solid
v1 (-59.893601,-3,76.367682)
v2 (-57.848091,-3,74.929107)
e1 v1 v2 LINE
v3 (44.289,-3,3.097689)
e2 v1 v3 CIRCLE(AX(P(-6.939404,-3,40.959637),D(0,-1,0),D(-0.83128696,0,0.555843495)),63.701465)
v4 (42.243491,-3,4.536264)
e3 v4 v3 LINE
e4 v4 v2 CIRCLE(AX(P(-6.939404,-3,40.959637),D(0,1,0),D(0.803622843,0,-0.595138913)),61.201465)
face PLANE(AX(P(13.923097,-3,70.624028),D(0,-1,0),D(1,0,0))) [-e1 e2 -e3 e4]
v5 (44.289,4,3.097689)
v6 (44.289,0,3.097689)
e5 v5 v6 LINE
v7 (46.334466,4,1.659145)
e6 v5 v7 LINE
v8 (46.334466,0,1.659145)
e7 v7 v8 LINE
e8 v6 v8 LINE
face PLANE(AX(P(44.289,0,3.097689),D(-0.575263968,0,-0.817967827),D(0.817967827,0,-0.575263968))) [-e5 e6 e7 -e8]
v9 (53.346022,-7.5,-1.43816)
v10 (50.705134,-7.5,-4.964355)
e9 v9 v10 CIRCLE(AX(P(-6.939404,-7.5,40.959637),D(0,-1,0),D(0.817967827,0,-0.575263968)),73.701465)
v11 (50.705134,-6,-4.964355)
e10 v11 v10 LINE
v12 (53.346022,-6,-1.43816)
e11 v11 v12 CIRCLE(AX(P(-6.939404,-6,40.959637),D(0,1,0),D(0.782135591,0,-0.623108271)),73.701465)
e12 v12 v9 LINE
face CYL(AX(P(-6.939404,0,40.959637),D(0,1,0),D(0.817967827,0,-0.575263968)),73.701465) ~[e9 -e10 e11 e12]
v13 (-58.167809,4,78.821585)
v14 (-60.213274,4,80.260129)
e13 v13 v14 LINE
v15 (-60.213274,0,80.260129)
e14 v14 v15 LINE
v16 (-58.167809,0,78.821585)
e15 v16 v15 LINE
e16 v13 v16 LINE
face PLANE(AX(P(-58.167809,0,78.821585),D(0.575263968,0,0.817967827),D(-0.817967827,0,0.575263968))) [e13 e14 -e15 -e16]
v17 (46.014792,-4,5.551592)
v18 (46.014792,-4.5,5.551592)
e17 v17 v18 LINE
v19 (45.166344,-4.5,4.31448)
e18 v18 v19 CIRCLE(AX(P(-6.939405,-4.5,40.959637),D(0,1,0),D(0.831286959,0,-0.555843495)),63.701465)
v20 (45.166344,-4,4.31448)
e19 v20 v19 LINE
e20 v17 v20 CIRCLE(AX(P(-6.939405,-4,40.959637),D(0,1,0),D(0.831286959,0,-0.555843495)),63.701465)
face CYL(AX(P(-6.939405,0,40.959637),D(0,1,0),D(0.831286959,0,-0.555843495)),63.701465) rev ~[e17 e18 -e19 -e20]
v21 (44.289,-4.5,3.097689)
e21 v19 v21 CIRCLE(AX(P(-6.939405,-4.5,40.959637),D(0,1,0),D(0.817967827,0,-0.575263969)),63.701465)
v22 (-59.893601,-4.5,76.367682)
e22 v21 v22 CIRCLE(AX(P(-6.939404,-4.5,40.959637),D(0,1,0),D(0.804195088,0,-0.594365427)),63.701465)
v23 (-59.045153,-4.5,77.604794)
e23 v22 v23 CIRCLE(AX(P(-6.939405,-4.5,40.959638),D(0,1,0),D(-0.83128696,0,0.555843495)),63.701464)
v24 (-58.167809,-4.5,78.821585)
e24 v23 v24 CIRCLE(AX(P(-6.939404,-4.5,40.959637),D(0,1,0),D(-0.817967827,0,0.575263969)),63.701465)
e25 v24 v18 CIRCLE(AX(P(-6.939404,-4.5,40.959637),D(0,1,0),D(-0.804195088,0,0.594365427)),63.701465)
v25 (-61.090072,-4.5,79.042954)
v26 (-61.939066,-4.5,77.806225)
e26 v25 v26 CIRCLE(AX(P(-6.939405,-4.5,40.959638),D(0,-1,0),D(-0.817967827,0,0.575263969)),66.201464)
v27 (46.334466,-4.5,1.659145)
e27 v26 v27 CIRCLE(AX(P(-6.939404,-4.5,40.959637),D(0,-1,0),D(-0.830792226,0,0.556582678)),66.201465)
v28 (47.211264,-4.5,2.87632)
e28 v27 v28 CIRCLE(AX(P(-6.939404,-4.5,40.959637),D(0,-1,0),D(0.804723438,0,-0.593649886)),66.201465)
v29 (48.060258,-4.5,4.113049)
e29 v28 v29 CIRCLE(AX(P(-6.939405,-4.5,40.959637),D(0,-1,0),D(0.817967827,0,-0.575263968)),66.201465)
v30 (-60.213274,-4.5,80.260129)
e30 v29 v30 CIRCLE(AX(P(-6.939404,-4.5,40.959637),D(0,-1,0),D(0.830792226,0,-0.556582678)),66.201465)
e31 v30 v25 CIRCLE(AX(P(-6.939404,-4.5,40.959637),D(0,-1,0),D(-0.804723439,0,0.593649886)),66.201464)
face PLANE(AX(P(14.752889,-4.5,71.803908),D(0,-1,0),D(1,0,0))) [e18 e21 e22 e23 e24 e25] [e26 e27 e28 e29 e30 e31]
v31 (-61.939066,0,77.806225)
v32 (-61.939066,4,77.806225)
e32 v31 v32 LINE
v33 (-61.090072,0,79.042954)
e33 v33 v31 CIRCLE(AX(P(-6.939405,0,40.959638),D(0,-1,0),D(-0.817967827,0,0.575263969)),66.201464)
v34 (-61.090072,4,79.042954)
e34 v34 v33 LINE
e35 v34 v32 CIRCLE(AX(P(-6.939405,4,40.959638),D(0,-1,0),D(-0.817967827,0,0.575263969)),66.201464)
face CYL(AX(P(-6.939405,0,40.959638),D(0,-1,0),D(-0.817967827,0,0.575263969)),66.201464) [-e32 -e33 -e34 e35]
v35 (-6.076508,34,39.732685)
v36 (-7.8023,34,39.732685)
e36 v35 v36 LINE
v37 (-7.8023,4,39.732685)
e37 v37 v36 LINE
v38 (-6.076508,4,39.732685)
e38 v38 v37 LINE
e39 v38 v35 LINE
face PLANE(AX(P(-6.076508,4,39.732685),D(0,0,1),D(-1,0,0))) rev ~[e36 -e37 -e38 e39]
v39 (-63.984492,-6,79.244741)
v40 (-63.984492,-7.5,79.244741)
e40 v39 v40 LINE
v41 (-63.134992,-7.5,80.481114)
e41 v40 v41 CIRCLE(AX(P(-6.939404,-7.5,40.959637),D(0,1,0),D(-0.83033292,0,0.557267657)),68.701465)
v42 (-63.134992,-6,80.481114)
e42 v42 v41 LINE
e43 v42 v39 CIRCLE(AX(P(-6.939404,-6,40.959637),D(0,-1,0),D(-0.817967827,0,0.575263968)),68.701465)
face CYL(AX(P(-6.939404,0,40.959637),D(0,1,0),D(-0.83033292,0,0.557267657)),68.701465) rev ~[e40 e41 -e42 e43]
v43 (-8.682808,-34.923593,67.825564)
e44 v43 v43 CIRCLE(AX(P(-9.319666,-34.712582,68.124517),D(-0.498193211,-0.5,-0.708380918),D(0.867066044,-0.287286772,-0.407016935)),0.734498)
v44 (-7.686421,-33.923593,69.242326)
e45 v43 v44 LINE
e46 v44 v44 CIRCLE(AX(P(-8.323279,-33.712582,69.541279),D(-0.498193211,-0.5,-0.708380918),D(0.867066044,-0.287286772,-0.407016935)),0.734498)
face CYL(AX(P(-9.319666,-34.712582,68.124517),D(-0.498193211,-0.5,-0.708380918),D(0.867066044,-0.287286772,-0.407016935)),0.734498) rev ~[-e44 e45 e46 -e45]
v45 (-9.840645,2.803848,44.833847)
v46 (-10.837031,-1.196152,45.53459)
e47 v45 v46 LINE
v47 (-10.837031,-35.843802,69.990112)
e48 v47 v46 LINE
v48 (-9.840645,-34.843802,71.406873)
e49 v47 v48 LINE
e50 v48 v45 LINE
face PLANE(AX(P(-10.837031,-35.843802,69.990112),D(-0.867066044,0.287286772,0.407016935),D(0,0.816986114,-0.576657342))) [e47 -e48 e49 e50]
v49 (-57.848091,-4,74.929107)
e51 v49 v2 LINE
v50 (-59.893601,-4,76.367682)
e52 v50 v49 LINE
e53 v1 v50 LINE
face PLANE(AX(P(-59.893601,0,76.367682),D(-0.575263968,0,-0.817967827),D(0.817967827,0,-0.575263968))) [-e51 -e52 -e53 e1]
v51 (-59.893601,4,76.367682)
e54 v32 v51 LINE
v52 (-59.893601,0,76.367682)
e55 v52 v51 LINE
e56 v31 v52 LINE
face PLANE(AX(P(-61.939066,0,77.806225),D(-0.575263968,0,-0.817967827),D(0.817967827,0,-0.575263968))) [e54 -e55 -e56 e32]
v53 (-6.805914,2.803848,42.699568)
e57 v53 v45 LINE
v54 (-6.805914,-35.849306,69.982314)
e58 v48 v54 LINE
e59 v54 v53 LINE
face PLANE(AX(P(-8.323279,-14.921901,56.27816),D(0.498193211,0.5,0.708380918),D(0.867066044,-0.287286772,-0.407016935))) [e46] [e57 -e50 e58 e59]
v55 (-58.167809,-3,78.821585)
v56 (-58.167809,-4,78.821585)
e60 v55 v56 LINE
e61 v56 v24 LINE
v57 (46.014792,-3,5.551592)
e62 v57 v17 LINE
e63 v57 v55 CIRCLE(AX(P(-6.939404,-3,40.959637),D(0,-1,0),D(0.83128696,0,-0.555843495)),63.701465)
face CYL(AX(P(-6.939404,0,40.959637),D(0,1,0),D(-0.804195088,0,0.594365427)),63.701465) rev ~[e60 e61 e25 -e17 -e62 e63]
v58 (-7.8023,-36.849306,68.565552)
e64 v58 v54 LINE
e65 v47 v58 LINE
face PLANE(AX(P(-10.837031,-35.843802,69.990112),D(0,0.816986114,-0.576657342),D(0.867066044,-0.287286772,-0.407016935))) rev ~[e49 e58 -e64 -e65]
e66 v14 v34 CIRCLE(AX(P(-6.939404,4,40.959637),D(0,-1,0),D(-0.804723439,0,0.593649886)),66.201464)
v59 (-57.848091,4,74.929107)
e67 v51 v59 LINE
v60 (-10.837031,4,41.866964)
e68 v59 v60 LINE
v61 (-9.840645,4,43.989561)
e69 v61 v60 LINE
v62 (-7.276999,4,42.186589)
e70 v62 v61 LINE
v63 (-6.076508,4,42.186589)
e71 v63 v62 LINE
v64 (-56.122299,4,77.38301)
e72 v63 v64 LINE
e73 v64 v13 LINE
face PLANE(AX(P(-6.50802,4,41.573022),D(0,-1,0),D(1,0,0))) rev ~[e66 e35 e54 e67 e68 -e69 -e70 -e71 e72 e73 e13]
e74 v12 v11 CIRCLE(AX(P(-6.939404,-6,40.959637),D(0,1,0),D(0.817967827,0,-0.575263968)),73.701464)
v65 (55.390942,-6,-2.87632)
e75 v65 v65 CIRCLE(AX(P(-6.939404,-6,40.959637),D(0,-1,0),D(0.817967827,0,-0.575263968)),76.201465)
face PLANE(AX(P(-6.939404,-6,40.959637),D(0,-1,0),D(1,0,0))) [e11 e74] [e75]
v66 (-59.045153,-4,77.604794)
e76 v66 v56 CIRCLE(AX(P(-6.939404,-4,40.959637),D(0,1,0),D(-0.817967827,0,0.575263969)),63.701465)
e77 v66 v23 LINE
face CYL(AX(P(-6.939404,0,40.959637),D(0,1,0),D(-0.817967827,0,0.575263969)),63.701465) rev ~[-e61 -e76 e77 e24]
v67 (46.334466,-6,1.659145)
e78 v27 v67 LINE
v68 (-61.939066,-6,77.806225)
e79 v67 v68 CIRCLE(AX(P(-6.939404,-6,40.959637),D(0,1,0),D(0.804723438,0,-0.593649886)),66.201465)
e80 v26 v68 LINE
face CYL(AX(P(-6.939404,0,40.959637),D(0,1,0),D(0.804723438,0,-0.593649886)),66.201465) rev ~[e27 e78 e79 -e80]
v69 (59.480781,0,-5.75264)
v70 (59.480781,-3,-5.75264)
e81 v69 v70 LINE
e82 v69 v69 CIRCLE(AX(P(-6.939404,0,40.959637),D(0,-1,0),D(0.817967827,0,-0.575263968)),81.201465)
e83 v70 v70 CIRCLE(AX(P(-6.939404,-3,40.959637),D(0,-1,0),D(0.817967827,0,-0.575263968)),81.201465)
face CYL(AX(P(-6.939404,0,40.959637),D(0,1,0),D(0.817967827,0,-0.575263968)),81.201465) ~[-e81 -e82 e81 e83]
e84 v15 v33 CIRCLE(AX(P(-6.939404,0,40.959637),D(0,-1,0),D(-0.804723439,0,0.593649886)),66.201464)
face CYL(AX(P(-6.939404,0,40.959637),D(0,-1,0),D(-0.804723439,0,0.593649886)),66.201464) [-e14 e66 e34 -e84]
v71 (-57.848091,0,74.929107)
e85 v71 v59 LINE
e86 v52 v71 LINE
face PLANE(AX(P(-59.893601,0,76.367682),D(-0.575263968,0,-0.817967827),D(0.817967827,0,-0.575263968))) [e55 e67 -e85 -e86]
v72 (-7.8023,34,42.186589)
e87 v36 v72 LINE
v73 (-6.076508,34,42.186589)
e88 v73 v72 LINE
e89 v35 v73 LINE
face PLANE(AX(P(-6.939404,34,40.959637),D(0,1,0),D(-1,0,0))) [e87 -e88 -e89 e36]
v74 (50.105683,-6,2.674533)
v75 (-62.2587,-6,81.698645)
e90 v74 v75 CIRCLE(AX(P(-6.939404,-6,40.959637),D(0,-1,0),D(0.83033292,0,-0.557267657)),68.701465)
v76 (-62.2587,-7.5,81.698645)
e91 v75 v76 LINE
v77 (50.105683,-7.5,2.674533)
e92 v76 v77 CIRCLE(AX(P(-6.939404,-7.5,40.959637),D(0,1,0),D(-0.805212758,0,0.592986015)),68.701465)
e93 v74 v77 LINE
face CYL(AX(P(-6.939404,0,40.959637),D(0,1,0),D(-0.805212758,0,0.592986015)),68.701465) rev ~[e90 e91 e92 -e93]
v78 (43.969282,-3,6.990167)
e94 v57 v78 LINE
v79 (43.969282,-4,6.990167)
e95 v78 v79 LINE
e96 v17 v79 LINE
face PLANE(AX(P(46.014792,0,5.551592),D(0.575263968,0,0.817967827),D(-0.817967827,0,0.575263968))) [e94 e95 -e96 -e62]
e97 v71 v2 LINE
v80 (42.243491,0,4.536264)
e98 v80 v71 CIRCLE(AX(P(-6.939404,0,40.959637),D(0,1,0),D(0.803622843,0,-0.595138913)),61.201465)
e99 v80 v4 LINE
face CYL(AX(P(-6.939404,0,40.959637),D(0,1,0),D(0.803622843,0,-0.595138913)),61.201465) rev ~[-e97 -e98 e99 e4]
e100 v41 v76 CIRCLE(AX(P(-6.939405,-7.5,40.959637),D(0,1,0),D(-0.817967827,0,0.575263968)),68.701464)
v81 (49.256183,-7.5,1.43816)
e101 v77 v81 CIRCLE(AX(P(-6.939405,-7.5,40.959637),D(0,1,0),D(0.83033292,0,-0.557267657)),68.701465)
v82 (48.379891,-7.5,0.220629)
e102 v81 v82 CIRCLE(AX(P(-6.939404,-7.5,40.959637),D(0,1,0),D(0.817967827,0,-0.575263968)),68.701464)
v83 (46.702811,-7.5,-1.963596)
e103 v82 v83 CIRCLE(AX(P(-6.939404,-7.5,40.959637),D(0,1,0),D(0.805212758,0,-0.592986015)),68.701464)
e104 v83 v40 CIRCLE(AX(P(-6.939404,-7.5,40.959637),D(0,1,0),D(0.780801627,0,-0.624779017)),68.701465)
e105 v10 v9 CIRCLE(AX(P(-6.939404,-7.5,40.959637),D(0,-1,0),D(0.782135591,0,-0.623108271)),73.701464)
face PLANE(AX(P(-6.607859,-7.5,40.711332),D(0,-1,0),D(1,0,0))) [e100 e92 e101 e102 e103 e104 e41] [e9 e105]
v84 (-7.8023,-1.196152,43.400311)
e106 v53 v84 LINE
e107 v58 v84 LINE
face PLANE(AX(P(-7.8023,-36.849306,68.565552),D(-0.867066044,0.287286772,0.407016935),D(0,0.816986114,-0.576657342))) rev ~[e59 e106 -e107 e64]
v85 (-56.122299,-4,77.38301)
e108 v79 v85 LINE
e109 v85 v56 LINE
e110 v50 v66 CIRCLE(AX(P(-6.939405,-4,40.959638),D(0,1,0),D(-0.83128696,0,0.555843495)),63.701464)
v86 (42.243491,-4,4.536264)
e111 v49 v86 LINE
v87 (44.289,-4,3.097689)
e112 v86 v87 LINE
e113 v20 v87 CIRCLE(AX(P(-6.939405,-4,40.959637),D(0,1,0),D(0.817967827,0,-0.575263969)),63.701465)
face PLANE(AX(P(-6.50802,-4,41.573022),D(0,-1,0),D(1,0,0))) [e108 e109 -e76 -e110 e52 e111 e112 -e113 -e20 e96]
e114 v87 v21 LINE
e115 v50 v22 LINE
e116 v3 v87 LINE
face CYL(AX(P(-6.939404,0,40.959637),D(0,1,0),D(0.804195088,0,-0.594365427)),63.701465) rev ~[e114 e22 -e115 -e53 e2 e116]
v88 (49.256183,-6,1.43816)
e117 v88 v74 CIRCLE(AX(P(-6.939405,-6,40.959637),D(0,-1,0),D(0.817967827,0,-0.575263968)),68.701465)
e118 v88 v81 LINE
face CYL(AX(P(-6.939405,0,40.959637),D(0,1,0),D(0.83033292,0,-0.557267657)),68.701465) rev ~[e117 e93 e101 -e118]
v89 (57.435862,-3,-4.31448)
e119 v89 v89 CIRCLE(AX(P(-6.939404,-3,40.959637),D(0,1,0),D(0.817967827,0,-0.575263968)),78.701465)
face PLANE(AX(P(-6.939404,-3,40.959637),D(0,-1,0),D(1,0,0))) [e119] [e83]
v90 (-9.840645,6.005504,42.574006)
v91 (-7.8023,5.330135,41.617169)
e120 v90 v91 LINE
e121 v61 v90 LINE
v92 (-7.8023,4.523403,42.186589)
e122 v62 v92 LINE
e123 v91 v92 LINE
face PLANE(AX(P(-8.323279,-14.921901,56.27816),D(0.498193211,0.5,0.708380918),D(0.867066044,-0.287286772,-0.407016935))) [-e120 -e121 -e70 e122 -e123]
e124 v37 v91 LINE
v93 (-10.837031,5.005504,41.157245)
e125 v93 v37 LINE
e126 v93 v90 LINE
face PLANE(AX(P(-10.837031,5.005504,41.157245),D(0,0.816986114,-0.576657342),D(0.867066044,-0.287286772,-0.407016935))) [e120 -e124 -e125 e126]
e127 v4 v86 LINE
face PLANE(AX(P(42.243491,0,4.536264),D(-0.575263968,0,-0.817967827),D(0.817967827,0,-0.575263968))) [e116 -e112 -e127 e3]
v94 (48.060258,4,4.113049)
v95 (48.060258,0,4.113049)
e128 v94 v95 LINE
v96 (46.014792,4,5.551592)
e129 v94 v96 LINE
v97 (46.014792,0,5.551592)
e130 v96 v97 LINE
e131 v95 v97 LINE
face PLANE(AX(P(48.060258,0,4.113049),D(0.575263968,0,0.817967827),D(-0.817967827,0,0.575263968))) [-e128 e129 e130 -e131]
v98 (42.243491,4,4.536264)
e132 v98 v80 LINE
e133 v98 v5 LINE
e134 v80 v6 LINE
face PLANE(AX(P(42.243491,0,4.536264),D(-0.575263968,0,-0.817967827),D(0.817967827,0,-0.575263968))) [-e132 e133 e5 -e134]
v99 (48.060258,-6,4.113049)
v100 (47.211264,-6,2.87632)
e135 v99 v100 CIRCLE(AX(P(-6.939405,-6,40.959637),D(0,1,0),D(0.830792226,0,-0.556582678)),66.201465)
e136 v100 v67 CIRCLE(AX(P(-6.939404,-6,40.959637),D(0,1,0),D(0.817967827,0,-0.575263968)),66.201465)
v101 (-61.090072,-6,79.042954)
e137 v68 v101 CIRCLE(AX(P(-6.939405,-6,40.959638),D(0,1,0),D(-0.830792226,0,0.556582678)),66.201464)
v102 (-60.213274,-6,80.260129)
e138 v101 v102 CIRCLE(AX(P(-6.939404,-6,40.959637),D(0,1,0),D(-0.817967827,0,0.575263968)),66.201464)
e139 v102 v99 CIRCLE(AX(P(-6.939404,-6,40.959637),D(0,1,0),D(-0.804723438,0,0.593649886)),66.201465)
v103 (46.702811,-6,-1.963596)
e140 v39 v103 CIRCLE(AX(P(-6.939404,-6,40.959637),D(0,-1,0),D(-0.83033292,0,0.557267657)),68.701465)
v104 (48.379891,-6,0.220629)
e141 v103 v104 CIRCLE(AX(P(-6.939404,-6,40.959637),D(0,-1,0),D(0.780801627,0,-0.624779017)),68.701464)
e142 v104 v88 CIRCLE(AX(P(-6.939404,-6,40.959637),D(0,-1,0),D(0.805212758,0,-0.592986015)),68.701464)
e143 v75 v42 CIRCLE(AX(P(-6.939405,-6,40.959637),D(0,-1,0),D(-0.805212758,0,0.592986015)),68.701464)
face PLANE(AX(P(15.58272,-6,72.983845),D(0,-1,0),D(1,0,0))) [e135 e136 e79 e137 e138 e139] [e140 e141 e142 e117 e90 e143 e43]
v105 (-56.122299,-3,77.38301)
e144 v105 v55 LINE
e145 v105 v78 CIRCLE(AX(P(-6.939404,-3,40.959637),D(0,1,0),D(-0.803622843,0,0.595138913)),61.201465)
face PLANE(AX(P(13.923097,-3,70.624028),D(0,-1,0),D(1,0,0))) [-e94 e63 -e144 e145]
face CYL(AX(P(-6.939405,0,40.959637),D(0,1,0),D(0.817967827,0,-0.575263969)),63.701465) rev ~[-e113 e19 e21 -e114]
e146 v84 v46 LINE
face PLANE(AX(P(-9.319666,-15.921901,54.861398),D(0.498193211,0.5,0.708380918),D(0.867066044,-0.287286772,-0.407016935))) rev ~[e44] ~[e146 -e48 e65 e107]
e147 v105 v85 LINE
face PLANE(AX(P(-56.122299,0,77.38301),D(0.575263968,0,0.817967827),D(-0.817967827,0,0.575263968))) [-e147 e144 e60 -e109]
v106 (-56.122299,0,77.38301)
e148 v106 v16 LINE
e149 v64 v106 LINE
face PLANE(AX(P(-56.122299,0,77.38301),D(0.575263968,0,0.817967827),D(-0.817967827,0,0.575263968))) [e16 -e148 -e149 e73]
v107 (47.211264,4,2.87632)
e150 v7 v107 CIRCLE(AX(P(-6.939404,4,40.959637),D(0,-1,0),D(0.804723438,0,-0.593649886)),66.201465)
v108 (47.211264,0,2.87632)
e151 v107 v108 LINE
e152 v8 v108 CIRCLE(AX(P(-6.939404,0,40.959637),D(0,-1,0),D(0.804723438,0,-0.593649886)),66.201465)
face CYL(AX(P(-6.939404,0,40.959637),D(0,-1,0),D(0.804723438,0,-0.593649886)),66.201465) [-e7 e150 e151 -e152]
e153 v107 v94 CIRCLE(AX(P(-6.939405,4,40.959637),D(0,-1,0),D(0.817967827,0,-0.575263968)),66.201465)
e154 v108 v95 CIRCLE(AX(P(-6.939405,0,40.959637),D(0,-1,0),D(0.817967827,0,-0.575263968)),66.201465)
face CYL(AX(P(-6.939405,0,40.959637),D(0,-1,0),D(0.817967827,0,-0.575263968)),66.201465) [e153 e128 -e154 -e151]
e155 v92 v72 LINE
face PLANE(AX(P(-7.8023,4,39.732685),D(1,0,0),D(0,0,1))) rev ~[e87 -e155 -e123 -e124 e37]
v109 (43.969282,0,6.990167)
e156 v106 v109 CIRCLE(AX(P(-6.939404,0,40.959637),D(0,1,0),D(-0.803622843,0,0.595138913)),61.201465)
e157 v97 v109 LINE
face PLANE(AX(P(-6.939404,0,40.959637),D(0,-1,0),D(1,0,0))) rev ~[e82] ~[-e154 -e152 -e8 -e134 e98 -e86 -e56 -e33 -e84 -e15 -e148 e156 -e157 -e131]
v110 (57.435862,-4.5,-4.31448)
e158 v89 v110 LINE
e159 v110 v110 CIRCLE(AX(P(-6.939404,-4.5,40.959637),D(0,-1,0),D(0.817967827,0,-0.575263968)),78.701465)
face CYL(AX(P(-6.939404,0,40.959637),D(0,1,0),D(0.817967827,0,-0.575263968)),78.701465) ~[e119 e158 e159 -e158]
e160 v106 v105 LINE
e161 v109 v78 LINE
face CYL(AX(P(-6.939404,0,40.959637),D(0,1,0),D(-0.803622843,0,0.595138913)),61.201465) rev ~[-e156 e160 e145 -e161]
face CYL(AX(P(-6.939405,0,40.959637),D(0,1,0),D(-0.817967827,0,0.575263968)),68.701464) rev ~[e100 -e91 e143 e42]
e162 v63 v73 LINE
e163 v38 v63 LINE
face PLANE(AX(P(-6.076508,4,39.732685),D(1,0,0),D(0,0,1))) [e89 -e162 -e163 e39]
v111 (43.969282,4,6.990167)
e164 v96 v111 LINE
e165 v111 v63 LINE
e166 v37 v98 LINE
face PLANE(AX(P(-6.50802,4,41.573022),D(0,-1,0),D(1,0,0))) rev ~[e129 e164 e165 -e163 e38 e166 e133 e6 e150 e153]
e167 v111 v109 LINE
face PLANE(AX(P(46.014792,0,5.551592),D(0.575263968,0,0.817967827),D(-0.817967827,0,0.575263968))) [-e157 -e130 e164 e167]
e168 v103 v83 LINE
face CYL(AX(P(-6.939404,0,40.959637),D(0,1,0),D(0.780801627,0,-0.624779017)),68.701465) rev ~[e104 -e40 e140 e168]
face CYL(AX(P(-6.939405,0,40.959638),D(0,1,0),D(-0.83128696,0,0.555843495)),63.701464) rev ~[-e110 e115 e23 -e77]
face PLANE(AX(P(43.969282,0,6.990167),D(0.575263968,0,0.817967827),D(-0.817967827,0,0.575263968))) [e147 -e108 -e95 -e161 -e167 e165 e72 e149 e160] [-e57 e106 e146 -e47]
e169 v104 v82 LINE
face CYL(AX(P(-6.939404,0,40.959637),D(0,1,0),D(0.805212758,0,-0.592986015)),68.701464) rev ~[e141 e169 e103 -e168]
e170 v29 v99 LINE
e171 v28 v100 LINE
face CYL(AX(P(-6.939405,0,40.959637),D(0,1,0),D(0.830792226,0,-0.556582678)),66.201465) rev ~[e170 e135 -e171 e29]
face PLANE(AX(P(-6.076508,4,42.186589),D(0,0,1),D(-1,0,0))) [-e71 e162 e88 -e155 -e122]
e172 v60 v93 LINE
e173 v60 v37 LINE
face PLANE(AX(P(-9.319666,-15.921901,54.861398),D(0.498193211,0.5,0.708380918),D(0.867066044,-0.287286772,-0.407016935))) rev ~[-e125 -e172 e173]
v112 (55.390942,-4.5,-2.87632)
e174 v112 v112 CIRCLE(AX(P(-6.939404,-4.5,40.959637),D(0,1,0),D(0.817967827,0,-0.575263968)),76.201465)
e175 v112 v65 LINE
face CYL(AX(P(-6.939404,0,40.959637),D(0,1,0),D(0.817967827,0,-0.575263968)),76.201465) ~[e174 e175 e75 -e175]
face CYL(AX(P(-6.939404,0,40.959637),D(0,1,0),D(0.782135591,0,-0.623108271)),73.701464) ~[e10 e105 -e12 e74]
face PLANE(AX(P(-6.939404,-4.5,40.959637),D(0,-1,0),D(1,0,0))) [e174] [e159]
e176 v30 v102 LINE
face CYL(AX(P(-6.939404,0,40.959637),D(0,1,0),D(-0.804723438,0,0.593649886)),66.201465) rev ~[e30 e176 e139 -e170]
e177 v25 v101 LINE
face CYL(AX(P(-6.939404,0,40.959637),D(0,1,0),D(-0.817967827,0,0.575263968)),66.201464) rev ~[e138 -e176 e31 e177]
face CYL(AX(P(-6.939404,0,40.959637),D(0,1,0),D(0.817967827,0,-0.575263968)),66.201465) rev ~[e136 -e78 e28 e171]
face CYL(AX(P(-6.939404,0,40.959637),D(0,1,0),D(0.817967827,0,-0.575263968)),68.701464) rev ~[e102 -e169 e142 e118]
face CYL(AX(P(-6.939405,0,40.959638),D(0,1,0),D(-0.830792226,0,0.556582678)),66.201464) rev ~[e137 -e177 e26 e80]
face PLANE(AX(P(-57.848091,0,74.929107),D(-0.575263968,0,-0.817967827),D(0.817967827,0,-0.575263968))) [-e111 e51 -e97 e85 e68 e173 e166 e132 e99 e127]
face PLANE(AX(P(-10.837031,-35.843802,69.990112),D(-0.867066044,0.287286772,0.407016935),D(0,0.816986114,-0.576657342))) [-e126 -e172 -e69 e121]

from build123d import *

# Parameters (mm, degrees)
F5_DEPTH  = 3
F6_DEPTH  = 4.5
F7_DEPTH  = 6
F8_DEPTH  = 7.5
F9_DEPTH  = 4
F12_W     = 1.7257919054
F12_H     = 2.4539034821
F13_DEPTH = 30
F15_W     = 3.5
F15_H     = 50
F16_DEPTH = 2
F17_R     = 0.7344979233
F18_DEPTH = 2


# Not quite as in the source:
# - the program builds the solid bodies; features that only make, move or delete a surface that nothing else refers to are left out


with BuildPart() as f5:
    # F4 (on 3pt) → F5 (new body)
    with BuildSketch(Plane.XZ):
        with BuildLine():
            ThreePointArc((-73.3595898483, 87.6719137514), (-53.6516810637, -25.4605484692), (59.4807811569, -5.7526396846))
            ThreePointArc((59.4807811569, -5.7526396846), (39.7728723723, 107.379822536), (-73.3595898483, 87.6719137514))
        make_face()
        with BuildLine():
            ThreePointArc((-71.3146702799, 86.2337538303), (38.3347124511, 105.3349029676), (57.4358615885, -4.3144797634))
            ThreePointArc((57.4358615885, -4.3144797634), (-52.2135211426, -23.4156289008), (-71.3146702799, 86.2337538303))
        make_face(mode=Mode.SUBTRACT)
    extrude(amount=F5_DEPTH)

    # F4 (on 3pt) → F6 (join)
    with BuildSketch(Plane.XZ):
        with BuildLine():
            ThreePointArc((-71.3146702799, 86.2337538303), (-52.2135211426, -23.4156289008), (57.4358615885, -4.3144797634))
            ThreePointArc((57.4358615885, -4.3144797634), (38.3347124511, 105.3349029676), (-71.3146702799, 86.2337538303))
        make_face()
        with BuildLine():
            ThreePointArc((-69.2697507115, 84.7955939091), (36.89655253, 103.2899833992), (55.3909420201, -2.8763198423))
            ThreePointArc((55.3909420201, -2.8763198423), (-50.7753612214, -21.3707093324), (-69.2697507115, 84.7955939091))
        make_face(mode=Mode.SUBTRACT)
    extrude(amount=F6_DEPTH)

    # F4 (on 3pt) → F7 (join)
    with BuildSketch(Plane.XZ):
        with BuildLine():
            ThreePointArc((-69.2697507115, 84.7955939091), (-50.7753612214, -21.3707093324), (55.3909420201, -2.8763198423))
            ThreePointArc((55.3909420201, -2.8763198423), (36.89655253, 103.2899833992), (-69.2697507115, 84.7955939091))
        make_face()
        with BuildLine():
            ThreePointArc((53.3460224517, -1.4381599211), (52.0519313936, -3.2209942256), (50.7051341625, -4.9643550723))
            ThreePointArc((50.7051341625, -4.9643550723), (-51.1200356047, -18.0316987059), (-67.2248311431, 83.357433988))
            ThreePointArc((-67.2248311431, 83.357433988), (35.4583926089, 101.2450638308), (53.3460224517, -1.4381599211))
        make_face(mode=Mode.SUBTRACT)
    extrude(amount=F7_DEPTH)



with BuildPart() as f5b:
    # F4 (on 3pt) → F5, piece 2 (new body)
    with BuildSketch(Plane.XZ):
        with BuildLine():
            ThreePointArc((46.0147924033, 5.5515923651), (29.7057529243, 93.0653855572), (-58.1678091893, 78.8215851838))
            Line((-58.1678091893, 78.8215851838), (-56.1222992763, 77.3830100825))
            ThreePointArc((-56.1222992763, 77.3830100825), (28.2675930031, 91.0204659888), (43.9692824902, 6.9901674664))
            Line((43.9692824902, 6.9901674664), (46.0147924033, 5.5515923651))
        make_face()
        with BuildLine():
            Line((-57.8480911816, 74.9291066004), (-59.8936010947, 76.3676817018))
            ThreePointArc((-59.8936010947, 76.3676817018), (-43.5845616157, -11.1461114904), (44.2890004979, 3.097688883))
            Line((44.2890004979, 3.097688883), (42.2434905848, 4.5362639843))
            ThreePointArc((42.2434905848, 4.5362639843), (-42.1464016945, -9.101191922), (-57.8480911816, 74.9291066004))
        make_face()
        with BuildLine():
            Line((-57.0002333011, 76.1666343822), (-59.0451528695, 77.6047943034))
            ThreePointArc((-59.0451528695, 77.6047943034), (-59.4730186996, 76.9887355996), (-59.8936010947, 76.3676817018))
            Line((-59.8936010947, 76.3676817018), (-57.8480911816, 74.9291066004))
            ThreePointArc((-57.8480911816, 74.9291066004), (-57.4279540232, 75.5504683256), (-57.0002333011, 76.1666343822))
        make_face()
        with BuildLine():
            ThreePointArc((-58.1678091893, 78.8215851838), (-58.6100629253, 78.2157724008), (-59.0451528695, 77.6047943034))
            Line((-59.0451528695, 77.6047943034), (-57.0002333011, 76.1666343822))
            ThreePointArc((-57.0002333011, 76.1666343822), (-56.5649932606, 76.7775122199), (-56.1222992763, 77.3830100825))
            Line((-56.1222992763, 77.3830100825), (-58.1678091893, 78.8215851838))
        make_face()
        with BuildLine():
            Line((42.2434905848, 4.5362639843), (44.2890004979, 3.097688883))
            ThreePointArc((44.2890004979, 3.097688883), (44.7312542339, 3.703501666), (45.1663441781, 4.3144797634))
            Line((45.1663441781, 4.3144797634), (43.1214246097, 5.7526396846))
            ThreePointArc((43.1214246097, 5.7526396846), (42.6861845692, 5.1417618469), (42.2434905848, 4.5362639843))
        make_face()
        with BuildLine():
            ThreePointArc((45.1663441781, 4.3144797634), (45.5942100081, 4.9305384673), (46.0147924033, 5.5515923651))
            Line((46.0147924033, 5.5515923651), (43.9692824902, 6.9901674664))
            ThreePointArc((43.9692824902, 6.9901674664), (43.5491453318, 6.3688057412), (43.1214246097, 5.7526396846))
            Line((43.1214246097, 5.7526396846), (45.1663441781, 4.3144797634))
        make_face()
    extrude(amount=F5_DEPTH)

    # F4 (on 3pt) → F6, piece 2 (join)
    with BuildSketch(Plane.XZ):
        with BuildLine():
            ThreePointArc((48.0602577115, 4.1130486336), (31.1439128454, 95.1103051256), (-60.2132744976, 80.2601289153))
            Line((-60.2132744976, 80.2601289153), (-58.1678091893, 78.8215851838))
            ThreePointArc((-58.1678091893, 78.8215851838), (29.7057529243, 93.0653855572), (46.0147924033, 5.5515923651))
            Line((46.0147924033, 5.5515923651), (48.0602577115, 4.1130486336))
        make_face()
        with BuildLine():
            Line((-59.0451528695, 77.6047943034), (-61.0900724379, 79.0429542245))
            ThreePointArc((-61.0900724379, 79.0429542245), (-61.5180724997, 78.4269946351), (-61.9390664029, 77.8062254332))
            Line((-61.9390664029, 77.8062254332), (-59.8936010947, 76.3676817018))
            ThreePointArc((-59.8936010947, 76.3676817018), (-59.4730186996, 76.9887355996), (-59.0451528695, 77.6047943034))
        make_face()
        with BuildLine():
            ThreePointArc((-60.2132744976, 80.2601289153), (-60.6551211593, 79.6540251319), (-61.0900724379, 79.0429542245))
            Line((-61.0900724379, 79.0429542245), (-59.0451528695, 77.6047943034))
            ThreePointArc((-59.0451528695, 77.6047943034), (-58.6100629253, 78.2157724008), (-58.1678091893, 78.8215851838))
            Line((-58.1678091893, 78.8215851838), (-60.2132744976, 80.2601289153))
        make_face()
        with BuildLine():
            Line((-59.8936010947, 76.3676817018), (-61.9390664029, 77.8062254332))
            ThreePointArc((-61.9390664029, 77.8062254332), (-45.0227215368, -13.1910310588), (46.3344658061, 1.6591451516))
            Line((46.3344658061, 1.6591451516), (44.2890004979, 3.097688883))
            ThreePointArc((44.2890004979, 3.097688883), (-43.5845616157, -11.1461114904), (-59.8936010947, 76.3676817018))
        make_face()
        with BuildLine():
            Line((44.2890004979, 3.097688883), (46.3344658061, 1.6591451516))
            ThreePointArc((46.3344658061, 1.6591451516), (46.7763124678, 2.2652489349), (47.2112637465, 2.8763198423))
            Line((47.2112637465, 2.8763198423), (45.1663441781, 4.3144797634))
            ThreePointArc((45.1663441781, 4.3144797634), (44.7312542339, 3.703501666), (44.2890004979, 3.097688883))
        make_face()
        with BuildLine():
            ThreePointArc((47.2112637465, 2.8763198423), (47.6392638082, 3.4922794317), (48.0602577115, 4.1130486336))
            Line((48.0602577115, 4.1130486336), (46.0147924033, 5.5515923651))
            ThreePointArc((46.0147924033, 5.5515923651), (45.5942100081, 4.9305384673), (45.1663441781, 4.3144797634))
            Line((45.1663441781, 4.3144797634), (47.2112637465, 2.8763198423))
        make_face()
    extrude(amount=F6_DEPTH)

    # F4 (on 3pt) → F7, piece 2 (join)
    with BuildSketch(Plane.XZ):
        with BuildLine():
            ThreePointArc((50.1056832868, 2.6745328458), (32.5820727666, 97.155224694), (-62.2587000728, 81.6986447031))
            Line((-62.2587000728, 81.6986447031), (-60.2132744976, 80.2601289153))
            ThreePointArc((-60.2132744976, 80.2601289153), (31.1439128454, 95.1103051256), (48.0602577115, 4.1130486336))
            Line((48.0602577115, 4.1130486336), (50.1056832868, 2.6745328458))
        make_face()
        with BuildLine():
            Line((46.5367490505, 1.5168825123), (48.3798913814, 0.2206293637))
            ThreePointArc((48.3798913814, 0.2206293637), (48.821360529, 0.8270028531), (49.2561833149, 1.4381599211))
            Line((49.2561833149, 1.4381599211), (47.2112637465, 2.8763198423))
            ThreePointArc((47.2112637465, 2.8763198423), (46.8221297031, 2.2223409394), (46.5367490505, 1.5168825123))
        make_face()
        with BuildLine():
            ThreePointArc((49.2561833149, 1.4381599211), (49.6843079108, 2.0540277213), (50.1056832868, 2.6745328458))
            Line((50.1056832868, 2.6745328458), (48.0602577115, 4.1130486336))
            ThreePointArc((48.0602577115, 4.1130486336), (47.6392638082, 3.4922794317), (47.2112637465, 2.8763198423))
            Line((47.2112637465, 2.8763198423), (49.2561833149, 1.4381599211))
        make_face()
        with BuildLine():
            Line((-61.9390664029, 77.8062254332), (-63.9844919782, 79.244741221))
            ThreePointArc((-63.9844919782, 79.244741221), (-47.5792051598, -14.432580971), (46.7028109016, -1.9635964074))
            ThreePointArc((46.7028109016, -1.9635964074), (46.3067843573, -0.2382907061), (46.5367490505, 1.5168825123))
            Line((46.5367490505, 1.5168825123), (46.3344658061, 1.6591451516))
            ThreePointArc((46.3344658061, 1.6591451516), (-45.0227215368, -13.1910310588), (-61.9390664029, 77.8062254332))
        make_face()
        with BuildLine():
            ThreePointArc((46.5367490505, 1.5168825123), (46.3067843573, -0.2382907061), (46.7028109016, -1.9635964074))
            ThreePointArc((46.7028109016, -1.9635964074), (47.552296206, -0.8798873024), (48.3798913814, 0.2206293637))
            Line((48.3798913814, 0.2206293637), (46.5367490505, 1.5168825123))
        make_face()
        with BuildLine():
            Line((46.3344658061, 1.6591451516), (46.5367490505, 1.5168825123))
            ThreePointArc((46.5367490505, 1.5168825123), (46.8221297031, 2.2223409394), (47.2112637465, 2.8763198423))
            ThreePointArc((47.2112637465, 2.8763198423), (46.7763124678, 2.2652489349), (46.3344658061, 1.6591451516))
        make_face()
        with BuildLine():
            ThreePointArc((-62.2587000728, 81.6986447031), (-62.7001692204, 81.0922712137), (-63.1349920063, 80.4811141457))
            Line((-63.1349920063, 80.4811141457), (-61.0900724379, 79.0429542245))
            ThreePointArc((-61.0900724379, 79.0429542245), (-60.6551211593, 79.6540251319), (-60.2132744976, 80.2601289153))
            Line((-60.2132744976, 80.2601289153), (-62.2587000728, 81.6986447031))
        make_face()
        with BuildLine():
            Line((-61.0900724379, 79.0429542245), (-63.1349920063, 80.4811141457))
            ThreePointArc((-63.1349920063, 80.4811141457), (-63.5631166022, 79.8652463455), (-63.9844919782, 79.244741221))
            Line((-63.9844919782, 79.244741221), (-61.9390664029, 77.8062254332))
            ThreePointArc((-61.9390664029, 77.8062254332), (-61.5180724997, 78.4269946351), (-61.0900724379, 79.0429542245))
        make_face()
    extrude(amount=F7_DEPTH)


with BuildPart() as f5_1:
    add(f5.part)

    add(f5b.part)  # F8 merges F5b
    # F4 (on 3pt) → F8 (join)
    with BuildSketch(Plane.XZ):
        with BuildLine():
            ThreePointArc((-67.2248311431, 83.357433988), (-51.1200356047, -18.0316987059), (50.7051341625, -4.9643550723))
            ThreePointArc((50.7051341625, -4.9643550723), (52.0519313936, -3.2209942256), (53.3460224517, -1.4381599211))
            ThreePointArc((53.3460224517, -1.4381599211), (35.4583926089, 101.2450638308), (-67.2248311431, 83.357433988))
        make_face()
        with BuildLine():
            add(Edge.make_bspline(
                [(-67.6660389606, 81.6562709846), (-67.6145472876, 81.1695281785), (-66.3966172272, 81.0419899879)],
                knots=[0, 0, 0, 1.0228935043, 1.0228935043, 1.0228935043], degree=2, weights=[1, 0.8720373231, 1]))
            add(Edge.make_bspline(
                [(-66.5532444111, 82.5225624891), (-67.7175306335, 82.1430137906), (-67.6660389606, 81.6562709846)],
                knots=[5.2602918029, 5.2602918029, 5.2602918029, 6.2831853072, 6.2831853072, 6.2831853072], degree=2, weights=[1, 0.8720373231, 1]))
            ThreePointArc((-66.5532444111, 82.5225624891), (-65.582869931, 83.3641355007), (-64.317015622, 83.1462258079))
            Line((-64.317015622, 83.1462258079), (-64.3040901023, 83.1371354922))
            ThreePointArc((-64.3040901023, 83.1371354922), (34.0202326877, 99.2001442624), (52.1510733163, 1.2360420567))
            Line((52.1510733163, 1.2360420567), (52.163998836, 1.226951741))
            ThreePointArc((52.163998836, 1.226951741), (52.5280546243, -0.8628959527), (50.4382069306, -1.226951741))
            Line((50.4382069306, -1.226951741), (50.4252814109, -1.2178614254))
            ThreePointArc((50.4252814109, -1.2178614254), (49.3711347658, -2.6152609375), (48.2829556417, -3.9863250279))
            ThreePointArc((48.2829556417, -3.9863250279), (-49.3183384503, -16.2563964918), (-66.0298820077, 80.6832320101))
            Line((-66.0298820077, 80.6832320101), (-66.0428075274, 80.6923223258))
            ThreePointArc((-66.0428075274, 80.6923223258), (-66.2343083584, 80.8523872769), (-66.3966172272, 81.0419899879))
        make_face(mode=Mode.SUBTRACT)
        with BuildLine():
            Line((-64.3040901023, 83.1371354922), (-63.7890663874, 82.7749273757))
            add(Edge.make_bspline(
                [(-62.7179712727, 82.0216429486), (-62.4931072818, 82.5873668381), (-63.7890663874, 82.7749273757)],
                knots=[2.9603434797, 2.9603434797, 2.9603434797, 4.0822497642, 4.0822497642, 4.0822497642], degree=2, weights=[1, 0.8467484302, 1]))
            Line((-62.7179712727, 82.0216429486), (-62.2587000728, 81.6986447031))
            ThreePointArc((-62.2587000728, 81.6986447031), (32.5820727666, 97.155224694), (50.1056832868, 2.6745328458))
            Line((50.1056832868, 2.6745328458), (52.1510733163, 1.2360420567))
            ThreePointArc((52.1510733163, 1.2360420567), (34.0202326877, 99.2001442624), (-64.3040901023, 83.1371354922))
        make_face()
        with BuildLine():
            Line((-63.9844919782, 79.244741221), (-66.0298820077, 80.6832320101))
            ThreePointArc((-66.0298820077, 80.6832320101), (-49.3183384503, -16.2563964918), (48.2829556417, -3.9863250279))
            ThreePointArc((48.2829556417, -3.9863250279), (47.3608751769, -3.0780847327), (46.7028109016, -1.9635964074))
            ThreePointArc((46.7028109016, -1.9635964074), (-47.5792051598, -14.432580971), (-63.9844919782, 79.244741221))
        make_face()
        with BuildLine():
            ThreePointArc((46.7028109016, -1.9635964074), (47.3608751769, -3.0780847327), (48.2829556417, -3.9863250279))
            ThreePointArc((48.2829556417, -3.9863250279), (49.3711347658, -2.6152609375), (50.4252814109, -1.2178614254))
            Line((50.4252814109, -1.2178614254), (48.3798913814, 0.2206293637))
            ThreePointArc((48.3798913814, 0.2206293637), (47.552296206, -0.8798873024), (46.7028109016, -1.9635964074))
        make_face()
        with BuildLine():
            Line((48.3798913814, 0.2206293637), (50.4252814109, -1.2178614254))
            ThreePointArc((50.4252814109, -1.2178614254), (50.8663994972, -0.6112372691), (51.3011028833, 0))
            Line((51.3011028833, 0), (49.2561833149, 1.4381599211))
            ThreePointArc((49.2561833149, 1.4381599211), (48.821360529, 0.8270028531), (48.3798913814, 0.2206293637))
        make_face()
        with BuildLine():
            ThreePointArc((51.3011028833, 0), (51.7293433302, 0.615782553), (52.1510733163, 1.2360420567))
            Line((52.1510733163, 1.2360420567), (50.1056832868, 2.6745328458))
            ThreePointArc((50.1056832868, 2.6745328458), (49.6843079108, 2.0540277213), (49.2561833149, 1.4381599211))
            Line((49.2561833149, 1.4381599211), (51.3011028833, 0))
        make_face()
        with BuildLine():
            Line((52.163998836, 1.226951741), (52.1510733163, 1.2360420567))
            ThreePointArc((52.1510733163, 1.2360420567), (51.7293433302, 0.615782553), (51.3011028833, 0))
            ThreePointArc((51.3011028833, 0), (50.8663994972, -0.6112372691), (50.4252814109, -1.2178614254))
            Line((50.4252814109, -1.2178614254), (50.4382069306, -1.226951741))
            ThreePointArc((50.4382069306, -1.226951741), (52.5280546243, -0.8628959527), (52.163998836, 1.226951741))
        make_face()
        with BuildLine():
            add(Edge.make_bspline(
                [(-65.8068258149, 81.0130418546), (-64.9669181483, 81.013935447), (-64.1732309553, 81.2112913458)],
                knots=[1.2791714406, 1.2791714406, 1.2791714406, 1.9505002951, 1.9505002951, 1.9505002951], degree=2, weights=[1, 0.944191658, 1]))
            ThreePointArc((-65.8068258149, 81.0130418546), (-65.9185844476, 80.8482928481), (-66.0298820077, 80.6832320101))
            Line((-66.0298820077, 80.6832320101), (-63.9844919782, 79.244741221))
            ThreePointArc((-63.9844919782, 79.244741221), (-63.5631166022, 79.8652463455), (-63.1349920063, 80.4811141457))
            Line((-63.1349920063, 80.4811141457), (-64.1732309553, 81.2112913458))
        make_face()
        with BuildLine():
            add(Edge.make_bspline(
                [(-63.7890663874, 82.7749273757), (-64.1322743412, 82.8245989032), (-64.5319262057, 82.8254939338)],
                knots=[4.0822497642, 4.0822497642, 4.0822497642, 4.4120018269, 4.4120018269, 4.4120018269], degree=2, weights=[1, 0.9864387099, 1]))
            ThreePointArc((-64.5319262057, 82.8254939338), (-64.8576913162, 82.3736513595), (-65.1799115747, 81.9192740668))
            Line((-65.1799115747, 81.9192740668), (-64.1732309553, 81.2112913458))
            add(Edge.make_bspline(
                [(-64.1732309553, 81.2112913458), (-62.915789112, 81.5239630979), (-62.7179712727, 82.0216429486)],
                knots=[1.9505002951, 1.9505002951, 1.9505002951, 2.9603434797, 2.9603434797, 2.9603434797], degree=2, weights=[1, 0.875212406, 1]))
            Line((-62.7179712727, 82.0216429486), (-63.7890663874, 82.7749273757))
        make_face()
        with BuildLine():
            ThreePointArc((-66.5532444111, 82.5225624891), (-66.6715880062, 81.7614722175), (-66.3966172272, 81.0419899879))
            add(Edge.make_bspline(
                [(-66.3966172272, 81.0419899879), (-66.1170245039, 81.0127118288), (-65.8068258149, 81.0130418546)],
                knots=[1.0228935043, 1.0228935043, 1.0228935043, 1.2791714406, 1.2791714406, 1.2791714406], degree=2, weights=[1, 0.9918014297, 1]))
            ThreePointArc((-65.8068258149, 81.0130418546), (-65.4951218735, 81.4673707765), (-65.1799115747, 81.9192740668))
            ThreePointArc((-65.1799115747, 81.9192740668), (-64.8576913162, 82.3736513595), (-64.5319262057, 82.8254939338))
            add(Edge.make_bspline(
                [(-64.5319262057, 82.8254939338), (-65.616534656, 82.8279229421), (-66.5532444111, 82.5225624891)],
                knots=[4.4120018269, 4.4120018269, 4.4120018269, 5.2602918029, 5.2602918029, 5.2602918029], degree=2, weights=[1, 0.9113909391, 1]))
        make_face()
        with BuildLine():
            add(Edge.make_bspline(
                [(-64.1732309553, 81.2112913458), (-62.915789112, 81.5239630979), (-62.7179712727, 82.0216429486)],
                knots=[1.9505002951, 1.9505002951, 1.9505002951, 2.9603434797, 2.9603434797, 2.9603434797], degree=2, weights=[1, 0.875212406, 1]))
            Line((-64.1732309553, 81.2112913458), (-63.1349920063, 80.4811141457))
            ThreePointArc((-63.1349920063, 80.4811141457), (-62.7001692204, 81.0922712137), (-62.2587000728, 81.6986447031))
            Line((-62.2587000728, 81.6986447031), (-62.7179712727, 82.0216429486))
        make_face()
        with BuildLine():
            ThreePointArc((-64.317015622, 83.1462258079), (-65.582869931, 83.3641355007), (-66.5532444111, 82.5225624891))
            add(Edge.make_bspline(
                [(-64.5319262057, 82.8254939338), (-65.616534656, 82.8279229421), (-66.5532444111, 82.5225624891)],
                knots=[4.4120018269, 4.4120018269, 4.4120018269, 5.2602918029, 5.2602918029, 5.2602918029], degree=2, weights=[1, 0.9113909391, 1]))
            ThreePointArc((-64.5319262057, 82.8254939338), (-64.4182193637, 82.981469125), (-64.3040901023, 83.1371354922))
            Line((-64.3040901023, 83.1371354922), (-64.317015622, 83.1462258079))
        make_face()
        with BuildLine():
            add(Edge.make_bspline(
                [(-66.5532444111, 82.5225624891), (-67.7175306335, 82.1430137906), (-67.6660389606, 81.6562709846)],
                knots=[5.2602918029, 5.2602918029, 5.2602918029, 6.2831853072, 6.2831853072, 6.2831853072], degree=2, weights=[1, 0.8720373231, 1]))
            add(Edge.make_bspline(
                [(-67.6660389606, 81.6562709846), (-67.6145472876, 81.1695281785), (-66.3966172272, 81.0419899879)],
                knots=[0, 0, 0, 1.0228935043, 1.0228935043, 1.0228935043], degree=2, weights=[1, 0.8720373231, 1]))
            ThreePointArc((-66.3966172272, 81.0419899879), (-66.6715880062, 81.7614722175), (-66.5532444111, 82.5225624891))
        make_face()
        with BuildLine():
            ThreePointArc((-65.1799115747, 81.9192740668), (-65.4951218735, 81.4673707765), (-65.8068258149, 81.0130418546))
            add(Edge.make_bspline(
                [(-65.8068258149, 81.0130418546), (-64.9669181483, 81.013935447), (-64.1732309553, 81.2112913458)],
                knots=[1.2791714406, 1.2791714406, 1.2791714406, 1.9505002951, 1.9505002951, 1.9505002951], degree=2, weights=[1, 0.944191658, 1]))
            Line((-64.1732309553, 81.2112913458), (-65.1799115747, 81.9192740668))
        make_face()
        with BuildLine():
            add(Edge.make_bspline(
                [(-62.7179712727, 82.0216429486), (-62.4931072818, 82.5873668381), (-63.7890663874, 82.7749273757)],
                knots=[2.9603434797, 2.9603434797, 2.9603434797, 4.0822497642, 4.0822497642, 4.0822497642], degree=2, weights=[1, 0.8467484302, 1]))
            Line((-63.7890663874, 82.7749273757), (-62.7179712727, 82.0216429486))
        make_face()
        with BuildLine():
            ThreePointArc((-64.3040901023, 83.1371354922), (-64.4182193637, 82.981469125), (-64.5319262057, 82.8254939338))
            add(Edge.make_bspline(
                [(-63.7890663874, 82.7749273757), (-64.1322743412, 82.8245989032), (-64.5319262057, 82.8254939338)],
                knots=[4.0822497642, 4.0822497642, 4.0822497642, 4.4120018269, 4.4120018269, 4.4120018269], degree=2, weights=[1, 0.9864387099, 1]))
            Line((-63.7890663874, 82.7749273757), (-64.3040901023, 83.1371354922))
        make_face()
        with BuildLine():
            add(Edge.make_bspline(
                [(-66.3966172272, 81.0419899879), (-66.1170245039, 81.0127118288), (-65.8068258149, 81.0130418546)],
                knots=[1.0228935043, 1.0228935043, 1.0228935043, 1.2791714406, 1.2791714406, 1.2791714406], degree=2, weights=[1, 0.9918014297, 1]))
            ThreePointArc((-66.3966172272, 81.0419899879), (-66.2343083584, 80.8523872769), (-66.0428075274, 80.6923223258))
            Line((-66.0428075274, 80.6923223258), (-66.0298820077, 80.6832320101))
            ThreePointArc((-66.0298820077, 80.6832320101), (-65.9185844476, 80.8482928481), (-65.8068258149, 81.0130418546))
        make_face()
    extrude(amount=F8_DEPTH)

    # F4 (on 3pt) → F9 (join, symmetric)
    with BuildSketch(Plane.XZ):
        with BuildLine():
            ThreePointArc((-56.1222992763, 77.3830100825), (-56.5649932606, 76.7775122199), (-57.0002333011, 76.1666343822))
            Line((-57.0002333011, 76.1666343822), (43.1214246097, 5.7526396846))
            ThreePointArc((43.1214246097, 5.7526396846), (43.5491453318, 6.3688057412), (43.9692824902, 6.9901674664))
            Line((43.9692824902, 6.9901674664), (-56.1222992763, 77.3830100825))
        make_face()
        with BuildLine():
            Line((43.1214246097, 5.7526396846), (-57.0002333011, 76.1666343822))
            ThreePointArc((-57.0002333011, 76.1666343822), (-57.4279540232, 75.5504683256), (-57.8480911816, 74.9291066004))
            Line((-57.8480911816, 74.9291066004), (42.2434905848, 4.5362639843))
            ThreePointArc((42.2434905848, 4.5362639843), (42.6861845692, 5.1417618469), (43.1214246097, 5.7526396846))
        make_face()
        with BuildLine():
            Line((44.2890004979, 3.097688883), (46.3344658061, 1.6591451516))
            ThreePointArc((46.3344658061, 1.6591451516), (46.7763124678, 2.2652489349), (47.2112637465, 2.8763198423))
            Line((47.2112637465, 2.8763198423), (45.1663441781, 4.3144797634))
            ThreePointArc((45.1663441781, 4.3144797634), (44.7312542339, 3.703501666), (44.2890004979, 3.097688883))
        make_face()
        with BuildLine():
            Line((42.2434905848, 4.5362639843), (44.2890004979, 3.097688883))
            ThreePointArc((44.2890004979, 3.097688883), (44.7312542339, 3.703501666), (45.1663441781, 4.3144797634))
            Line((45.1663441781, 4.3144797634), (43.1214246097, 5.7526396846))
            ThreePointArc((43.1214246097, 5.7526396846), (42.6861845692, 5.1417618469), (42.2434905848, 4.5362639843))
        make_face()
        with BuildLine():
            ThreePointArc((45.1663441781, 4.3144797634), (45.5942100081, 4.9305384673), (46.0147924033, 5.5515923651))
            Line((46.0147924033, 5.5515923651), (43.9692824902, 6.9901674664))
            ThreePointArc((43.9692824902, 6.9901674664), (43.5491453318, 6.3688057412), (43.1214246097, 5.7526396846))
            Line((43.1214246097, 5.7526396846), (45.1663441781, 4.3144797634))
        make_face()
        with BuildLine():
            ThreePointArc((47.2112637465, 2.8763198423), (47.6392638082, 3.4922794317), (48.0602577115, 4.1130486336))
            Line((48.0602577115, 4.1130486336), (46.0147924033, 5.5515923651))
            ThreePointArc((46.0147924033, 5.5515923651), (45.5942100081, 4.9305384673), (45.1663441781, 4.3144797634))
            Line((45.1663441781, 4.3144797634), (47.2112637465, 2.8763198423))
        make_face()
        with BuildLine():
            ThreePointArc((-58.1678091893, 78.8215851838), (-58.6100629253, 78.2157724008), (-59.0451528695, 77.6047943034))
            Line((-59.0451528695, 77.6047943034), (-57.0002333011, 76.1666343822))
            ThreePointArc((-57.0002333011, 76.1666343822), (-56.5649932606, 76.7775122199), (-56.1222992763, 77.3830100825))
            Line((-56.1222992763, 77.3830100825), (-58.1678091893, 78.8215851838))
        make_face()
        with BuildLine():
            Line((-57.0002333011, 76.1666343822), (-59.0451528695, 77.6047943034))
            ThreePointArc((-59.0451528695, 77.6047943034), (-59.4730186996, 76.9887355996), (-59.8936010947, 76.3676817018))
            Line((-59.8936010947, 76.3676817018), (-57.8480911816, 74.9291066004))
            ThreePointArc((-57.8480911816, 74.9291066004), (-57.4279540232, 75.5504683256), (-57.0002333011, 76.1666343822))
        make_face()
        with BuildLine():
            ThreePointArc((-60.2132744976, 80.2601289153), (-60.6551211593, 79.6540251319), (-61.0900724379, 79.0429542245))
            Line((-61.0900724379, 79.0429542245), (-59.0451528695, 77.6047943034))
            ThreePointArc((-59.0451528695, 77.6047943034), (-58.6100629253, 78.2157724008), (-58.1678091893, 78.8215851838))
            Line((-58.1678091893, 78.8215851838), (-60.2132744976, 80.2601289153))
        make_face()
        with BuildLine():
            Line((-59.0451528695, 77.6047943034), (-61.0900724379, 79.0429542245))
            ThreePointArc((-61.0900724379, 79.0429542245), (-61.5180724997, 78.4269946351), (-61.9390664029, 77.8062254332))
            Line((-61.9390664029, 77.8062254332), (-59.8936010947, 76.3676817018))
            ThreePointArc((-59.8936010947, 76.3676817018), (-59.4730186996, 76.9887355996), (-59.0451528695, 77.6047943034))
        make_face()
    extrude(amount=F9_DEPTH, both=True)

    # F12 (on face) → F13 (join)
    with BuildSketch(Plane(origin=(0, 4, 0), x_dir=(-1, 0, 0), z_dir=(0, 1, 0))):
        with Locations((6.9394043457, 40.9596370334)):
            Rectangle(F12_W, F12_H)
    extrude(amount=F13_DEPTH)

    # F15 (on face) → F16 (join)
    with BuildSketch(Plane(origin=(13.0819673587, 13.1294115227, 18.6012491737), x_dir=(0.8670660442, -0.2872867724, -0.4070169351), z_dir=(0.4981932106, 0.5, 0.708380918))):
        with Locations((-25.8361325358, -44.6442002186)):
            Rectangle(F15_W, F15_H)
    extrude(amount=F16_DEPTH)

    # F17 (on face) → F18 (cut, through all)
    with BuildSketch(Plane(origin=(13.0819673587, 13.1294115227, 18.6012491737), x_dir=(0.8670660442, -0.2872867724, -0.4070169351), z_dir=(-0.4981932106, -0.5, -0.708380918))):
        with Locations((-25.8361325358, 67.6442002186)):
            Circle(F17_R)
    extrude(amount=-F18_DEPTH, mode=Mode.SUBTRACT)


solid = f5_1.part
